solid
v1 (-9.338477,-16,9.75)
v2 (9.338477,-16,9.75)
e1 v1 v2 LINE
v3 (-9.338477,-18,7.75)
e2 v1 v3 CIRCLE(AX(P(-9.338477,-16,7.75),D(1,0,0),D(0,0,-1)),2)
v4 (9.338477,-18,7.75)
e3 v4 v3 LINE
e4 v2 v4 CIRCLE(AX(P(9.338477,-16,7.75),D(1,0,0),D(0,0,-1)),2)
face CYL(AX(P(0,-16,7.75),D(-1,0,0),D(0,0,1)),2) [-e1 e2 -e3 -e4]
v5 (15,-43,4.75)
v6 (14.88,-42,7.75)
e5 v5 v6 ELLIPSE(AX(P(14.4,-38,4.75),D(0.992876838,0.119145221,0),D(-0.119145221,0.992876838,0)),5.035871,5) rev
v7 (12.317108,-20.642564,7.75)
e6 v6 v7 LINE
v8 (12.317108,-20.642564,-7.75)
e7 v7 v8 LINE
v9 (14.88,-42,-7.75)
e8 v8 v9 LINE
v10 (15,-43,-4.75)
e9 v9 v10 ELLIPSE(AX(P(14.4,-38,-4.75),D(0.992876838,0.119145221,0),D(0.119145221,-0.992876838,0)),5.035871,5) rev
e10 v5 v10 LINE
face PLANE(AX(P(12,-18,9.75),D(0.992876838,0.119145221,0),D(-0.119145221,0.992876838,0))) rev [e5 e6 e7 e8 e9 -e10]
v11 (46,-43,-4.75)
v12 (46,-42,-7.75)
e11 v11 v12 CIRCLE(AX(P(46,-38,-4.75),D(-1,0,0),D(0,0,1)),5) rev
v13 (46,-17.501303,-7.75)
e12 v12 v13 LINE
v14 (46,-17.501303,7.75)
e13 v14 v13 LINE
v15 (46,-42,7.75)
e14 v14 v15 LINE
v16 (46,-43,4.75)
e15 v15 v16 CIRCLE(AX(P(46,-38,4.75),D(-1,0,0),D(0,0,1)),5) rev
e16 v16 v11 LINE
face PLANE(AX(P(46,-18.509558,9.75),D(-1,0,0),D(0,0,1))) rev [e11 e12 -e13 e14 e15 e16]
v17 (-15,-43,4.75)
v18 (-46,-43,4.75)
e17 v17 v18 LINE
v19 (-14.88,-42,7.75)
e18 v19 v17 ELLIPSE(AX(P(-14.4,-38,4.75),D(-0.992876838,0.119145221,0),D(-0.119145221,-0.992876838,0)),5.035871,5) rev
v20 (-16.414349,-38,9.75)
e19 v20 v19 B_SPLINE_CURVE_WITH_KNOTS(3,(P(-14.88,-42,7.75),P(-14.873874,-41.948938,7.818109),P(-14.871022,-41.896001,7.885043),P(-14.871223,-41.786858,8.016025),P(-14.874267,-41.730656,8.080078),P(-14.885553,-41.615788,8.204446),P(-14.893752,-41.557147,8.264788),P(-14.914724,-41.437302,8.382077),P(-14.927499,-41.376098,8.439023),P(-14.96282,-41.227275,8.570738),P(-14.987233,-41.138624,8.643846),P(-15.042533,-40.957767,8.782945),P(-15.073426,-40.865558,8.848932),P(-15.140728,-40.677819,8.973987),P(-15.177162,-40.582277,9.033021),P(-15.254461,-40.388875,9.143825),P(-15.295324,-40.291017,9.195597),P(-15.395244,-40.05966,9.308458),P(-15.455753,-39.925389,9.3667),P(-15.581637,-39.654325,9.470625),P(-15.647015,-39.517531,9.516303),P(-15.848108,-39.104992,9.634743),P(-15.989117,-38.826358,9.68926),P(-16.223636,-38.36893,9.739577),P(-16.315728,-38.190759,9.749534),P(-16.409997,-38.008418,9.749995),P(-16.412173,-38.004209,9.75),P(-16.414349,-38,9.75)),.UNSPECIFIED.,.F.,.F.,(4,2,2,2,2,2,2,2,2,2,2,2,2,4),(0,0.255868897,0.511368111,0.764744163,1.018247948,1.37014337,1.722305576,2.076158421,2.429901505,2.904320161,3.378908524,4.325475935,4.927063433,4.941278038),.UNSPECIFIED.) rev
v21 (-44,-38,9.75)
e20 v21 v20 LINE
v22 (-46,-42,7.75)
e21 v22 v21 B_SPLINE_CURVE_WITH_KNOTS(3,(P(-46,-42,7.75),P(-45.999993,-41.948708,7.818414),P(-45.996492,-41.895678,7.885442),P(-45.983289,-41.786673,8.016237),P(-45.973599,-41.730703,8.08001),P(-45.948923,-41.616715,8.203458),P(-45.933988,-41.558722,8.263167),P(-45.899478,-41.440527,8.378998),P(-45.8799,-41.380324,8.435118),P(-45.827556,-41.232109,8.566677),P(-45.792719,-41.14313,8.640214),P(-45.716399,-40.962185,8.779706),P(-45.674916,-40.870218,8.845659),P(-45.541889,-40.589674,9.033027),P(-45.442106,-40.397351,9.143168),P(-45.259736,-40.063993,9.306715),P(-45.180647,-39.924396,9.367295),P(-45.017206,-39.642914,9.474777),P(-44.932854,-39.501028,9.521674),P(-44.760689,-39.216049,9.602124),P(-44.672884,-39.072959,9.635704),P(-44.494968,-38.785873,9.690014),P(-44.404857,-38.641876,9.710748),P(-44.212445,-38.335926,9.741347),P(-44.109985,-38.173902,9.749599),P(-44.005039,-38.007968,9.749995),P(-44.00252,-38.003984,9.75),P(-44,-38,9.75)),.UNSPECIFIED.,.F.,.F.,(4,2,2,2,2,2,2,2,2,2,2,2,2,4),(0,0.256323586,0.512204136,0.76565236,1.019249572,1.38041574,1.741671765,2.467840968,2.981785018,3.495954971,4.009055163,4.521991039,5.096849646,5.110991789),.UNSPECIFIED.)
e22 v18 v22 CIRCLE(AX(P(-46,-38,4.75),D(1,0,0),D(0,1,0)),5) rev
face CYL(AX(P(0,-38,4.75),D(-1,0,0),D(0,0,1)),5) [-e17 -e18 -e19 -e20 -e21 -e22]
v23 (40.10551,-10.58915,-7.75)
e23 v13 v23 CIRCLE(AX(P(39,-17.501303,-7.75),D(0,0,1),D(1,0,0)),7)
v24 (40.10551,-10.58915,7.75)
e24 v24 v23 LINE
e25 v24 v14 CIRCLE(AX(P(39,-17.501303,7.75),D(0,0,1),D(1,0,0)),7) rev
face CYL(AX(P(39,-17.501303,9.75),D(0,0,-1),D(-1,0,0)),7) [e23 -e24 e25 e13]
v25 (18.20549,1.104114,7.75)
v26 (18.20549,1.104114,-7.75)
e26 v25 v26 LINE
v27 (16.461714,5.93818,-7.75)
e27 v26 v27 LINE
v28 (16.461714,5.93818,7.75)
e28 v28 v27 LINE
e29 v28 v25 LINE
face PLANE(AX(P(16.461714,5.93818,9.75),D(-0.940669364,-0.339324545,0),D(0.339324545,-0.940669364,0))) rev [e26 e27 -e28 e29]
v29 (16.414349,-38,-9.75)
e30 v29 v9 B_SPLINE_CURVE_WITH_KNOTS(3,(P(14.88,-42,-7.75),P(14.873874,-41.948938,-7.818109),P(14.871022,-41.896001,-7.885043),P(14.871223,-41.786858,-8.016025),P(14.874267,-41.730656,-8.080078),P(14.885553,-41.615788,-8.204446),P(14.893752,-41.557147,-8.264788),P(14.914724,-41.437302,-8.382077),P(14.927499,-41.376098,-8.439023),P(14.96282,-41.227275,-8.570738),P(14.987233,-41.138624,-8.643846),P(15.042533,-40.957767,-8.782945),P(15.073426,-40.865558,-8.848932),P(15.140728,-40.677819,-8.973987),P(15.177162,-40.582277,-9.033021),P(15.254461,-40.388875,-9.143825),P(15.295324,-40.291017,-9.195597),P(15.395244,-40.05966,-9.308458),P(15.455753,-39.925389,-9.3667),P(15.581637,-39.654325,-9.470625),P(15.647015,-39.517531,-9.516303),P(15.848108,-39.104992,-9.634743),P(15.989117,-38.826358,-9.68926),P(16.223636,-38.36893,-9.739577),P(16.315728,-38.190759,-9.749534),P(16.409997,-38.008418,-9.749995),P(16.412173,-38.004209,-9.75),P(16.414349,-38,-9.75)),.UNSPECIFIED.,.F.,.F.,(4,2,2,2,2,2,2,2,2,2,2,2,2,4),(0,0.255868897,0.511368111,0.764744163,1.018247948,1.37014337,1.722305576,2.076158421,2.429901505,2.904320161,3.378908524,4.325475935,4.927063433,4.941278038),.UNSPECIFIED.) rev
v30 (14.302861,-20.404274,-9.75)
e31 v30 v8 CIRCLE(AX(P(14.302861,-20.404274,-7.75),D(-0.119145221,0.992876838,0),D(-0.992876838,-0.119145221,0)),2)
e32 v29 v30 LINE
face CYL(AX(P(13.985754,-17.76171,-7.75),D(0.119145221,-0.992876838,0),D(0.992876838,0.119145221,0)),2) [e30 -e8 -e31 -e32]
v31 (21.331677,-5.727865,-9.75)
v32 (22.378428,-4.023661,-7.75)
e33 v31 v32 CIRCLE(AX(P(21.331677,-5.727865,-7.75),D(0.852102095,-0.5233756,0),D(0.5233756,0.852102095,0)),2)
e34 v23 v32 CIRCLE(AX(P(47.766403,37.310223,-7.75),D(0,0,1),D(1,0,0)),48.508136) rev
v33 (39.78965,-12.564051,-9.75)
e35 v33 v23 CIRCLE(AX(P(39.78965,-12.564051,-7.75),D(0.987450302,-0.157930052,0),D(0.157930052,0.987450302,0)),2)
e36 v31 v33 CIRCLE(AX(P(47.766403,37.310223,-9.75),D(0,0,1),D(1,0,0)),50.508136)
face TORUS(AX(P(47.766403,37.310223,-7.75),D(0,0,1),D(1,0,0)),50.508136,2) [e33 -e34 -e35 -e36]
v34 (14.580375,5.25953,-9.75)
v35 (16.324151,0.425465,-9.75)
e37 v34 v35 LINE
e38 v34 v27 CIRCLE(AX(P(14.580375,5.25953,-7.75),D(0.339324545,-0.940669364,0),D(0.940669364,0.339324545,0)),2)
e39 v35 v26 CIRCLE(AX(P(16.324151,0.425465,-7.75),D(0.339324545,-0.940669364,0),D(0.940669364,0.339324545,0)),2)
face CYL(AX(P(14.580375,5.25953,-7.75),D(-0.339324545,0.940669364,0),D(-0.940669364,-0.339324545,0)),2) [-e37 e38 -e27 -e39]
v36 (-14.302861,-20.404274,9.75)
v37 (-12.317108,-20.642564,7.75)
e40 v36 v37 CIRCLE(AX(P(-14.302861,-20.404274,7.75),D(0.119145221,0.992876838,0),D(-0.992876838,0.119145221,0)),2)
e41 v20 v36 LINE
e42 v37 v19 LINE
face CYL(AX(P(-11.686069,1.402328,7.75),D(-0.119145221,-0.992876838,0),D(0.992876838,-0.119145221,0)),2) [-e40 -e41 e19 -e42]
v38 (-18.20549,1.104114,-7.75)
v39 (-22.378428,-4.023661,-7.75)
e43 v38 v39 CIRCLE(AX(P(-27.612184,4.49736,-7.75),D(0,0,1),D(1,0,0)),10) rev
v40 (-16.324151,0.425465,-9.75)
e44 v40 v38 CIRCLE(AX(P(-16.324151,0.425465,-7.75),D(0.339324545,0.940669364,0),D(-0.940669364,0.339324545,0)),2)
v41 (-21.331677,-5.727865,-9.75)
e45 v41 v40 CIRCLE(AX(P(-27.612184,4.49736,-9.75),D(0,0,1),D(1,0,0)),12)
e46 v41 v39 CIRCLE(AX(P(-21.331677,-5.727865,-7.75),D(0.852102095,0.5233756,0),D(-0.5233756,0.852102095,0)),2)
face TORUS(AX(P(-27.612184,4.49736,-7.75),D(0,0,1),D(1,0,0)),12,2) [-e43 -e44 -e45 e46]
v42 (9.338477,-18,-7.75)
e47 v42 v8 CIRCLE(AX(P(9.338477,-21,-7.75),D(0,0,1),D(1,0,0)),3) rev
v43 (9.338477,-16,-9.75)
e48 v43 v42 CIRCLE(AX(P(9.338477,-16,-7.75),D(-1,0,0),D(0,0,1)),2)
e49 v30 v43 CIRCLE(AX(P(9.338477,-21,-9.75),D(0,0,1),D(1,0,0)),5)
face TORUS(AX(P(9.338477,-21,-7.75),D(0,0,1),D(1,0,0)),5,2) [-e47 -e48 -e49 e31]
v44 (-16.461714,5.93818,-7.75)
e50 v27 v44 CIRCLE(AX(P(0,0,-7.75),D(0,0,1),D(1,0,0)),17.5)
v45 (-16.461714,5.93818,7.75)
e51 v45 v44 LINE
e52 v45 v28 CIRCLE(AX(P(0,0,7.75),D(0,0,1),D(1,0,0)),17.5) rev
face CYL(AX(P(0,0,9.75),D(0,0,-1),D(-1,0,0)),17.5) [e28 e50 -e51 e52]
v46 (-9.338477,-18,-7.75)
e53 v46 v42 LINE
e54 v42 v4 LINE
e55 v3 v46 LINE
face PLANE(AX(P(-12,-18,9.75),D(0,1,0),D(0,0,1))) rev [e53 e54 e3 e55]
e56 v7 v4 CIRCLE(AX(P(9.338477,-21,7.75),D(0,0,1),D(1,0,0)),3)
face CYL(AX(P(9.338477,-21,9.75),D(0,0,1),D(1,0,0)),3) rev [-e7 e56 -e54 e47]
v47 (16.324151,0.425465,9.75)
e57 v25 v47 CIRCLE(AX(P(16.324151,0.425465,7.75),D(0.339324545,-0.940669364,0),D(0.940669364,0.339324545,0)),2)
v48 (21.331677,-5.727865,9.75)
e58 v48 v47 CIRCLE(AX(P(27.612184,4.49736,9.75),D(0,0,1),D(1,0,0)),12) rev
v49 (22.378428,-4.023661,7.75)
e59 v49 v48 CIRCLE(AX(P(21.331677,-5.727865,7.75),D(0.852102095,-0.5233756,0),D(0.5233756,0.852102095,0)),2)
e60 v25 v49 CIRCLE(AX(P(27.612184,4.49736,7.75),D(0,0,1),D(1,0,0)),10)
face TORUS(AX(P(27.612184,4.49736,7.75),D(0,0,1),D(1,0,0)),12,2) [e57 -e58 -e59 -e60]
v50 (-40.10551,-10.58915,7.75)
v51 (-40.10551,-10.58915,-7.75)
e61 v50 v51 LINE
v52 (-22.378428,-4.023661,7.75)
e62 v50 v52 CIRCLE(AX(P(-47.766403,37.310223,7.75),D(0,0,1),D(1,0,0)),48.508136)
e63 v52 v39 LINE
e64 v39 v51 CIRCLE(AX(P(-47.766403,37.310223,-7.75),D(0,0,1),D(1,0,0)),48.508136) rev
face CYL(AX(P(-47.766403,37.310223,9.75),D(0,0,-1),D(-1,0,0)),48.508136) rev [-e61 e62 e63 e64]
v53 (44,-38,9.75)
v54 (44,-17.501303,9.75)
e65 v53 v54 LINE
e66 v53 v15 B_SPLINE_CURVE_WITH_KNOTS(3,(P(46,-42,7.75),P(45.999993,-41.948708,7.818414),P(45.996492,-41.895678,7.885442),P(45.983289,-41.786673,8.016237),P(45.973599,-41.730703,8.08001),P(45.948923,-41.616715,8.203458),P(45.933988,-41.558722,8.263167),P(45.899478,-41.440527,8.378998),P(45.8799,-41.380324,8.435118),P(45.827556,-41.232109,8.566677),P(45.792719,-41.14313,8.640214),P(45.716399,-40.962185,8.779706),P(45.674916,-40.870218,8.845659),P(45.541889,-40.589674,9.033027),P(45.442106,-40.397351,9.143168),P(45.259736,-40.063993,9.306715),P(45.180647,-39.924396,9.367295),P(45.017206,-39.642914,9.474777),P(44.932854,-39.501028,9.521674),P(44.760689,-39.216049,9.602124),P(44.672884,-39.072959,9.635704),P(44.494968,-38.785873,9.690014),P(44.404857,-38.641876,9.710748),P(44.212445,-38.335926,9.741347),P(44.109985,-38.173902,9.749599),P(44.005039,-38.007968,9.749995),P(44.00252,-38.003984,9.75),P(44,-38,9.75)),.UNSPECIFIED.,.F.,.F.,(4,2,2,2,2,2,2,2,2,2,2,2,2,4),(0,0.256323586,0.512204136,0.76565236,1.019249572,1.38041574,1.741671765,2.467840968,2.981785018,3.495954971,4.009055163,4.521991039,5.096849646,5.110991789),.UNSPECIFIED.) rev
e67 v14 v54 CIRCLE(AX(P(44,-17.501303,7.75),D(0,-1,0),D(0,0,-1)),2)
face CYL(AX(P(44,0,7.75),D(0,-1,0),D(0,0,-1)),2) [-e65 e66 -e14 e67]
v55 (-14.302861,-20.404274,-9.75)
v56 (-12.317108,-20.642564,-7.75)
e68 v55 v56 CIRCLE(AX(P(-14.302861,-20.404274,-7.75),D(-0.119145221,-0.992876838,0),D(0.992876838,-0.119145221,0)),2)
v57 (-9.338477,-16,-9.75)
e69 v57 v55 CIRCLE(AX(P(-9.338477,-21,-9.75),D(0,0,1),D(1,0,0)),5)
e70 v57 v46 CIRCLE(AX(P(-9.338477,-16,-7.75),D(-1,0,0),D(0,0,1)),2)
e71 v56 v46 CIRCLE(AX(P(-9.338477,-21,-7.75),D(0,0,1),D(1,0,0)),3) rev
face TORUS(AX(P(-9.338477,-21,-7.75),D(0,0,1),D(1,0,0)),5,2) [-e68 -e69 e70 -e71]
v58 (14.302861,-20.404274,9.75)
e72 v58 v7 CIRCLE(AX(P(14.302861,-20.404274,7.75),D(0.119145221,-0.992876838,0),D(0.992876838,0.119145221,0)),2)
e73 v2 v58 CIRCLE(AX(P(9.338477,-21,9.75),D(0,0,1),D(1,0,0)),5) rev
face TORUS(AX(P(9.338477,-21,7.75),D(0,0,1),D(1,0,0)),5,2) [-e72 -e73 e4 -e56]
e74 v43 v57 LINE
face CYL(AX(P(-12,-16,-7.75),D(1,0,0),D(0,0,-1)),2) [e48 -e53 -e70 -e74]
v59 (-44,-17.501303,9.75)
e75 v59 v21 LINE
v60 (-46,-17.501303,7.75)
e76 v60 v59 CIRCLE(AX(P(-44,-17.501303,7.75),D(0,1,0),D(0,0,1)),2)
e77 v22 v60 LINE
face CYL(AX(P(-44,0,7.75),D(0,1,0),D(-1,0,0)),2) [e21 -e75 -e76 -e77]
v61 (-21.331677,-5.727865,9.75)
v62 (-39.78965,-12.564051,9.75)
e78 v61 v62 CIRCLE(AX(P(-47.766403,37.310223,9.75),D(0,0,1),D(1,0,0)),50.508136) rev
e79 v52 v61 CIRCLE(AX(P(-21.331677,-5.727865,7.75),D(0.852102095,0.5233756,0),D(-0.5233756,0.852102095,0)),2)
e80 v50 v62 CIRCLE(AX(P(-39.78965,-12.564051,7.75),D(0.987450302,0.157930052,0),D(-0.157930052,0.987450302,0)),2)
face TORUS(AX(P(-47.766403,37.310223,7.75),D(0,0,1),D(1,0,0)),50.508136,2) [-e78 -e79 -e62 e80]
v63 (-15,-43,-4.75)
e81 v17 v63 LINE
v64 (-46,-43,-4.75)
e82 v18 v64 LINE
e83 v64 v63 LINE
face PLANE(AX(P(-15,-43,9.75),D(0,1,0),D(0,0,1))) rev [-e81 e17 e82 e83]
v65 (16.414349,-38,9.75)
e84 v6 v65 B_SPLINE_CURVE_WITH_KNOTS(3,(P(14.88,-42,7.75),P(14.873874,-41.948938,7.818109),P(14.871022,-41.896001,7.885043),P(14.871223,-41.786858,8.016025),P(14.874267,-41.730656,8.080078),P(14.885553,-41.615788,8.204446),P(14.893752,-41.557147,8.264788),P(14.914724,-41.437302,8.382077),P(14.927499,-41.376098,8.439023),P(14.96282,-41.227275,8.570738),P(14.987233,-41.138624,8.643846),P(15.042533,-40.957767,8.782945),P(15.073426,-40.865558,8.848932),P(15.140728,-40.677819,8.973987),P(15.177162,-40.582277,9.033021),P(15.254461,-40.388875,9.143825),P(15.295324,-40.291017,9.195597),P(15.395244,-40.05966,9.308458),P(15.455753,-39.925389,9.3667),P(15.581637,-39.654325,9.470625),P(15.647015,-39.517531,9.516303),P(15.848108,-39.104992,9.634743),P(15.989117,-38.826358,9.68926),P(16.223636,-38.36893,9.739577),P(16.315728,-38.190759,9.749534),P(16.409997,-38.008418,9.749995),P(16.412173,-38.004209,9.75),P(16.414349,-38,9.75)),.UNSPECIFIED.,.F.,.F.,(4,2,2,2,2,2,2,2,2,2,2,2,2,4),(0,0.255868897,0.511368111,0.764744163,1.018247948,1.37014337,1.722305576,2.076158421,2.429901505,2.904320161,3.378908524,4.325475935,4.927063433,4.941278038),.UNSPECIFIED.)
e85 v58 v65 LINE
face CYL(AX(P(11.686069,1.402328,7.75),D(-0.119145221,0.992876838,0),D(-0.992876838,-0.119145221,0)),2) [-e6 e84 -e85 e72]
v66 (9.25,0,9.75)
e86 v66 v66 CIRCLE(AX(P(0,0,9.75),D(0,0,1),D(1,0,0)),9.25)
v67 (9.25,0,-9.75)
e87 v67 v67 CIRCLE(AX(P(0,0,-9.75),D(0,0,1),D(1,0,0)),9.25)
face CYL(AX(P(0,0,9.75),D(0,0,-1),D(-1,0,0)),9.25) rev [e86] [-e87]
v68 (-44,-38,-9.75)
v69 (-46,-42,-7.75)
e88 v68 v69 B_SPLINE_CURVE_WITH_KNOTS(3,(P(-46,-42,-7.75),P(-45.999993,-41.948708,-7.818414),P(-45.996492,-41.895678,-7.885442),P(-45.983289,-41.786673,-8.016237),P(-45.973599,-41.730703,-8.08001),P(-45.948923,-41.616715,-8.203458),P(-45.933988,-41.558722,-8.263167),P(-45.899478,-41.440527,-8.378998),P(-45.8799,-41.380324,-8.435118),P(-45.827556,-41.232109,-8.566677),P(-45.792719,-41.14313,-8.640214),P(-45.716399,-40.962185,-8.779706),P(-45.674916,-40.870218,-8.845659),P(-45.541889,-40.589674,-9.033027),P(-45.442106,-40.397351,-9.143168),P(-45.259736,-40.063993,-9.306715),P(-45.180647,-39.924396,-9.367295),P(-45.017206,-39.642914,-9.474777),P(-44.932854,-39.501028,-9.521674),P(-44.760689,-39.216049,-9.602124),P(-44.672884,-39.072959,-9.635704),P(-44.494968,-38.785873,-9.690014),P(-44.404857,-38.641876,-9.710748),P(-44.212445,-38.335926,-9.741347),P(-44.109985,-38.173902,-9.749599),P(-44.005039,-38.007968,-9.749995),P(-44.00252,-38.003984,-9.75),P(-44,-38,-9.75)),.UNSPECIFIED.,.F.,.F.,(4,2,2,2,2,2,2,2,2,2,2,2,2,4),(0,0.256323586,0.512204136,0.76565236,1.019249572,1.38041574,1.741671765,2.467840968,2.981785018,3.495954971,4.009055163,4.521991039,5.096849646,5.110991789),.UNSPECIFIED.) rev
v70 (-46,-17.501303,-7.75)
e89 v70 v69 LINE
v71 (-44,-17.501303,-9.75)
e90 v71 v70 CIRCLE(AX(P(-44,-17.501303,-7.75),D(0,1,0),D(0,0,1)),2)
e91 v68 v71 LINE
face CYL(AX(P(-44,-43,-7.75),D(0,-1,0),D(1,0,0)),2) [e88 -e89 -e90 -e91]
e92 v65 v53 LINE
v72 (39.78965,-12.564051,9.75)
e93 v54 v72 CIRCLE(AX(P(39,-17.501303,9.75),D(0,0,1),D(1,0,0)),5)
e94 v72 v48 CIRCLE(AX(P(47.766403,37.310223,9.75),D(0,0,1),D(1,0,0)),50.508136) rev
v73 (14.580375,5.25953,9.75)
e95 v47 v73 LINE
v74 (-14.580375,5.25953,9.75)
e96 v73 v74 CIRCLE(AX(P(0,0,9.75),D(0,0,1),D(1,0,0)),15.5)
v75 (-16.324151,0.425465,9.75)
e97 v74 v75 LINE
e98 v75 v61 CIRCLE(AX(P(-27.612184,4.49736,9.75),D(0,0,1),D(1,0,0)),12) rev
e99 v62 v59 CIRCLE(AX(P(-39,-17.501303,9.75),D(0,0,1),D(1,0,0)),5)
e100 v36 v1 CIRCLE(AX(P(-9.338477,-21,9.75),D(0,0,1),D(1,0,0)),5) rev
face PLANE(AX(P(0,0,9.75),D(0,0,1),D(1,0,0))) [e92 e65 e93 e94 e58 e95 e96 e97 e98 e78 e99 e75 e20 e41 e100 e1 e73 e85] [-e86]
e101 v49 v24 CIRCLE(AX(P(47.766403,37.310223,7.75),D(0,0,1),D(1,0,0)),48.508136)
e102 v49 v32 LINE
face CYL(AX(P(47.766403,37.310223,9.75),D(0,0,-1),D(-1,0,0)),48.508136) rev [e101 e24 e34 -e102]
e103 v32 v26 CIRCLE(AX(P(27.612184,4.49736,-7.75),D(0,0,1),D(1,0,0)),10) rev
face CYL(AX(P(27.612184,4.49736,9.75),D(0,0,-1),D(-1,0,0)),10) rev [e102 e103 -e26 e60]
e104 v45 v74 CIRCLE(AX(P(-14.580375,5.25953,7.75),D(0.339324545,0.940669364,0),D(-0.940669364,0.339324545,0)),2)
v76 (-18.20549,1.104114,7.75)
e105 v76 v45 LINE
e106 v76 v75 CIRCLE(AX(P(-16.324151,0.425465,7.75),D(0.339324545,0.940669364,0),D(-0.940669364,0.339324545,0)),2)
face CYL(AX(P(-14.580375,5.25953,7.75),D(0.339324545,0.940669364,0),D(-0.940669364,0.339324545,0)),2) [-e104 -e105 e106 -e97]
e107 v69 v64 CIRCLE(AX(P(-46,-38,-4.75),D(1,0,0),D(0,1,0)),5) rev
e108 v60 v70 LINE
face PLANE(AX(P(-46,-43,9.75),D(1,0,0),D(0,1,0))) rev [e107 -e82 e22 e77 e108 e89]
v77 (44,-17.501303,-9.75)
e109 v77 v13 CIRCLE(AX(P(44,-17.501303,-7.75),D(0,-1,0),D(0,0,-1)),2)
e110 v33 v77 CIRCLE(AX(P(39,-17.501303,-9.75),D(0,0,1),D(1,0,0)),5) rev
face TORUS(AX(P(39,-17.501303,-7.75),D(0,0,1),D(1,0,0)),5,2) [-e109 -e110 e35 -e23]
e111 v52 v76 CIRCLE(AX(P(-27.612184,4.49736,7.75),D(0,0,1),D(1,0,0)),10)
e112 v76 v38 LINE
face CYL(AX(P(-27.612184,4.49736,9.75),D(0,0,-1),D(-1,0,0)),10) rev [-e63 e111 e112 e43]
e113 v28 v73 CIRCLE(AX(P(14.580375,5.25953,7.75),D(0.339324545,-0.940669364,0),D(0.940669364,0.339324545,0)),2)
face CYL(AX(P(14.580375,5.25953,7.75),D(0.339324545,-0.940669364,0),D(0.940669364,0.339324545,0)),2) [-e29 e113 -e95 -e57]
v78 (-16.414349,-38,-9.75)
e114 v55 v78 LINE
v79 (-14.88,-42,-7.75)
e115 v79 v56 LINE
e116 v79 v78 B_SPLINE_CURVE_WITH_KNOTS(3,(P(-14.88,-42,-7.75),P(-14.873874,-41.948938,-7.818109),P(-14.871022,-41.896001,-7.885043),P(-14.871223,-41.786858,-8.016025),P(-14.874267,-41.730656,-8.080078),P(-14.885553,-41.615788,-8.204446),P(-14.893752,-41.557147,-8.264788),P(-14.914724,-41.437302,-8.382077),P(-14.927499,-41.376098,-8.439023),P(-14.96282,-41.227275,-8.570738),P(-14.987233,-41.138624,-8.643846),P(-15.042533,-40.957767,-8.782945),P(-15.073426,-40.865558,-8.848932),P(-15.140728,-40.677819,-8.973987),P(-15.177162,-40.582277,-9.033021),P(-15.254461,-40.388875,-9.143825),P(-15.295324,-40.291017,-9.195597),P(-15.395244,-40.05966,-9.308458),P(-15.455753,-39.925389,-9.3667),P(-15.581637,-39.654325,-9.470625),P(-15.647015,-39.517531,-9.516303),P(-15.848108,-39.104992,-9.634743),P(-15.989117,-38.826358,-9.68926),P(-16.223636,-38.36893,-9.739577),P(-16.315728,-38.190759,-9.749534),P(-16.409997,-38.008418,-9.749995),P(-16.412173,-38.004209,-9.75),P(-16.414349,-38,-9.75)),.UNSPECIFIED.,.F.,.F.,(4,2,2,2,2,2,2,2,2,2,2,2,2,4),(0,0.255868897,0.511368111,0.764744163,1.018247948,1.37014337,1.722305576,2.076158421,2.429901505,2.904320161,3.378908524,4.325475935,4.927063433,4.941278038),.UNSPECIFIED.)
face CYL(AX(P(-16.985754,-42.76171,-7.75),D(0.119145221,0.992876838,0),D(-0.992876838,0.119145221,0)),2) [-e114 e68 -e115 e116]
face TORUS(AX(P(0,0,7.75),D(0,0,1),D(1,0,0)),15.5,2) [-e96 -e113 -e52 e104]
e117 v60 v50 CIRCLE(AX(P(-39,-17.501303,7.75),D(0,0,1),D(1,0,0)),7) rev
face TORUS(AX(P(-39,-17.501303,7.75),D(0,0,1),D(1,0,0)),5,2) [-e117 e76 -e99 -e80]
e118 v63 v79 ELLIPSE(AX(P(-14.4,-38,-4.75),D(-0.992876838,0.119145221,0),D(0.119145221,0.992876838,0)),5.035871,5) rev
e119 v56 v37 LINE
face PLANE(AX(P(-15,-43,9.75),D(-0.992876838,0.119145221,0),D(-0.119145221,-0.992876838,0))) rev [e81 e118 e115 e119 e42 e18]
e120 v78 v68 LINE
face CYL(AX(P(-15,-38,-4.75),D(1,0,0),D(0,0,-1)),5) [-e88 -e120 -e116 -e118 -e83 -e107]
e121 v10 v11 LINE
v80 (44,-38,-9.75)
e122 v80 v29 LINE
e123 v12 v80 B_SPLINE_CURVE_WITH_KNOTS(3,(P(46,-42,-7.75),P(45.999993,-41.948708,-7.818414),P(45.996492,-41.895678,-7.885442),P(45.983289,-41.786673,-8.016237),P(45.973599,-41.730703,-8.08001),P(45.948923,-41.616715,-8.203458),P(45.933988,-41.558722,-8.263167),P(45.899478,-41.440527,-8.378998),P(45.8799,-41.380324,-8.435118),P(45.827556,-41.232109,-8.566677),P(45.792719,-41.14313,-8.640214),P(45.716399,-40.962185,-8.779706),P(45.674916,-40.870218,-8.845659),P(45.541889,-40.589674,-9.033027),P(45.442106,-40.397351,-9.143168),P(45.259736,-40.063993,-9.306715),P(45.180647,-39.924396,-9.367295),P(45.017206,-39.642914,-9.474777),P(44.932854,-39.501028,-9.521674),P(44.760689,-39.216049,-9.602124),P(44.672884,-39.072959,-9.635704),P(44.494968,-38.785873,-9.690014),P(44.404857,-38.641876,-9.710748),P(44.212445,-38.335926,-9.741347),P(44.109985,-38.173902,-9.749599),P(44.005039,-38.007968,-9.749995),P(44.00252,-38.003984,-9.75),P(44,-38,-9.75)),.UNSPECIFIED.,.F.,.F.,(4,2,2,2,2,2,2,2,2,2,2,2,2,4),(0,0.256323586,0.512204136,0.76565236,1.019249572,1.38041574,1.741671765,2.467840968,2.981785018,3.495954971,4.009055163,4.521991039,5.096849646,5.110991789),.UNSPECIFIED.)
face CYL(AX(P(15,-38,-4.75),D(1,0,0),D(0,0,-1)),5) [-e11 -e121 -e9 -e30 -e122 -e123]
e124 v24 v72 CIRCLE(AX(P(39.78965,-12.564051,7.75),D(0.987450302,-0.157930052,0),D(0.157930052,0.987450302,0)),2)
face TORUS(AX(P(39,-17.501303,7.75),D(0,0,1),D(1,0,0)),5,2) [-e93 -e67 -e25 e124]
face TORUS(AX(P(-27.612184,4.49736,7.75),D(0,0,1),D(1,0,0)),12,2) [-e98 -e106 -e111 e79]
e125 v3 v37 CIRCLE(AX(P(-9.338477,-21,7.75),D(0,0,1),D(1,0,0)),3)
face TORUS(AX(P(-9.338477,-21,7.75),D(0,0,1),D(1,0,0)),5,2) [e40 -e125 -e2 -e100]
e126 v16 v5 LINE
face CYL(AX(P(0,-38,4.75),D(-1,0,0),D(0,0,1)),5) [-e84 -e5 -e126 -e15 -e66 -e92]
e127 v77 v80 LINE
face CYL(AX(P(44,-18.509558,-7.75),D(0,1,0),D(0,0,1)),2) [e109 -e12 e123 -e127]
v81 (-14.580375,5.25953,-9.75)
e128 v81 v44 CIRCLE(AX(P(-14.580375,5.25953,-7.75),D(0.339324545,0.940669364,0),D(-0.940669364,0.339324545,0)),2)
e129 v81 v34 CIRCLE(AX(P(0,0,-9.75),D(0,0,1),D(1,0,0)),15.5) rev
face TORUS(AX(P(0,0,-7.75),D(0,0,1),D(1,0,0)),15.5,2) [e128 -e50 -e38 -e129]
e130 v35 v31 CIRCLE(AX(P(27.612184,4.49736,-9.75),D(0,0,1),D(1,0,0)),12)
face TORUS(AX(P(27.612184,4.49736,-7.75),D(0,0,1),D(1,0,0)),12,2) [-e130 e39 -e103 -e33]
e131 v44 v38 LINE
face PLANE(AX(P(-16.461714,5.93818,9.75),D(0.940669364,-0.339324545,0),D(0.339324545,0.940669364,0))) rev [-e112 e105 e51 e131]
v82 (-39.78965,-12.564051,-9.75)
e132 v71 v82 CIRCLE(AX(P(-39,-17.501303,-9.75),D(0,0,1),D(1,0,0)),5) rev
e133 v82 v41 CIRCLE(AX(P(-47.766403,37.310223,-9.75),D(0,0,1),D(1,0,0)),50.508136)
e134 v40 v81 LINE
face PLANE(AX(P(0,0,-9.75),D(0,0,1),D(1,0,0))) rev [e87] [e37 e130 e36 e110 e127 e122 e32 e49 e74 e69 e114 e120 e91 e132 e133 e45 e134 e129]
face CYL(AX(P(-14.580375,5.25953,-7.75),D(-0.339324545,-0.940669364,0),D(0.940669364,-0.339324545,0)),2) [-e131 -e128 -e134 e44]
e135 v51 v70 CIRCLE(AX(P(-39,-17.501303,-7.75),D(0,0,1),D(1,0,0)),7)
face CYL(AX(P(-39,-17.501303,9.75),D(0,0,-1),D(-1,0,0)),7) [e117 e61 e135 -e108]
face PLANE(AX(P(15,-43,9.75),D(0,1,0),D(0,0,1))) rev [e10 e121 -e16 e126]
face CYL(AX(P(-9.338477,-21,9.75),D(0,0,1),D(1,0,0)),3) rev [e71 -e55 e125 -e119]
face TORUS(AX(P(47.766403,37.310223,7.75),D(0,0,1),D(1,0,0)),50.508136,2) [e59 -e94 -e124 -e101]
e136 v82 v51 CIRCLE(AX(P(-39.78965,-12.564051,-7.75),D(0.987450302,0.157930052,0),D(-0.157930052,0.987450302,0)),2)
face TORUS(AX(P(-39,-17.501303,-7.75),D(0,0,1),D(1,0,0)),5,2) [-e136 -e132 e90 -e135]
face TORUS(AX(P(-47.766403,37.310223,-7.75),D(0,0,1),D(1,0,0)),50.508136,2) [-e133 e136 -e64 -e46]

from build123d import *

# Parameters (mm, degrees)
CROQUIS1_R              = 9.25
SALIENTE_EXTRUIR1_DEPTH = 9.75
REDONDEO4_R             = 3
REDONDEO5_R             = 2
REDONDEO6_R             = 5


with BuildPart() as part:
    # Croquis1 → Saliente-Extruir1 (new, symmetric)
    with BuildSketch(Plane.XY):
        with BuildLine():
            Line((16.461713879, 5.938179534), (18.205490224, 1.104114294))
            ThreePointArc((18.205490224, 1.104114294), (19.855946903, -1.814596224), (22.378427867, -4.023661212))
            ThreePointArc((22.378427867, -4.023661212), (30.919049272, -8.178302275), (40.105510362, -10.589150466))
            ThreePointArc((40.105510362, -10.589150466), (44.326282594, -12.959198031), (46, -17.50130258))
            Line((46, -17.50130258), (46, -18.509558121))
            Line((46, -18.509558121), (46, -43))
            Line((46, -43), (15, -43))
            Line((15, -43), (12, -18))
            Line((12, -18), (-12, -18))
            Line((-12, -18), (-15, -43))
            Line((-15, -43), (-46, -43))
            Line((-46, -43), (-46, -18.509558121))
            Line((-46, -18.509558121), (-46, -17.50130258))
            ThreePointArc((-46, -17.50130258), (-44.326282594, -12.959198031), (-40.105510362, -10.589150466))
            ThreePointArc((-40.105510362, -10.589150466), (-30.919049272, -8.178302275), (-22.378427867, -4.023661212))
            ThreePointArc((-22.378427867, -4.023661212), (-19.855946903, -1.814596224), (-18.205490224, 1.104114294))
            Line((-18.205490224, 1.104114294), (-16.461713879, 5.938179534))
            ThreePointArc((-16.461713879, 5.938179534), (0, 17.5), (16.461713879, 5.938179534))
        make_face()
        Circle(CROQUIS1_R, mode=Mode.SUBTRACT)
    extrude(amount=SALIENTE_EXTRUIR1_DEPTH, both=True)

    # Redondeo4
    redondeo4_edges = [part.edges().sort_by_distance(p)[0] for p in [
        (12, -18, 0),
        (-12, -18, 0),
    ]]
    fillet(redondeo4_edges, radius=REDONDEO4_R)

    # Redondeo5
    redondeo5_edges = [part.edges().sort_by_distance(p)[0] for p in [
        (-19.855946903, -1.814596224, 9.75),
        (-30.919049272, -8.178302275, 9.75),
        (17.333602052, 3.521146914, -9.75),
        (-44.326282594, -12.959198031, 9.75),
        (19.855946903, -1.814596224, -9.75),
        (30.919049272, -8.178302275, -9.75),
        (44.326282594, -12.959198031, -9.75),
        (46, -30.25065129, -9.75),
        (-46, -30.25065129, 9.75),
        (-13.65855386, -31.821282169, -9.75),
        (-46, -30.25065129, -9.75),
        (-44.326282594, -12.959198031, -9.75),
        (-30.919049272, -8.178302275, -9.75),
        (-19.855946903, -1.814596224, -9.75),
        (-17.333602052, 3.521146914, -9.75),
        (0, 17.5, -9.75),
        (-13.65855386, -31.821282169, 9.75),
        (0, 17.5, 9.75),
        (46, -30.25065129, 9.75),
        (44.326282594, -12.959198031, 9.75),
        (30.919049272, -8.178302275, 9.75),
        (19.855946903, -1.814596224, 9.75),
        (13.65855386, -31.821282169, -9.75),
        (13.65855386, -31.821282169, 9.75),
        (0, -18, -9.75),
        (17.333602052, 3.521146914, 9.75),
        (0, -18, 9.75),
        (11.329418316, -18.755862417, -9.75),
        (11.329418316, -18.755862417, 9.75),
        (-11.329418316, -18.755862417, -9.75),
        (-11.329418316, -18.755862417, 9.75),
        (-17.333602052, 3.521146914, 9.75),
    ]]
    fillet(redondeo5_edges, radius=REDONDEO5_R)

    # Redondeo6
    # the kernel refuses this fillet: 5 mm, written as the material it takes off along each edge
    with BuildSketch(Plane(origin=(56.5, -43, 9.75), x_dir=(0, 1, 0), z_dir=(-1, 0, 0)), Plane(origin=(-4.51434853, -43, 9.75), x_dir=(0, 1, 0), z_dir=(-1, 0, 0)), Plane(origin=(56.5, -43, -9.75), x_dir=(0, 0, 1), z_dir=(-1, 0, 0)), Plane(origin=(-4.51434853, -43, -9.75), x_dir=(0, 0, 1), z_dir=(-1, 0, 0))) as redondeo6_piece_1:
        with BuildLine():
            CenterArc((REDONDEO6_R, REDONDEO6_R), REDONDEO6_R, 180, 90)
            Line((0, REDONDEO6_R), (0, 0))
            Line((0, 0), (REDONDEO6_R, 0))
        make_face()
    extrude(amount=51.98565147, mode=Mode.SUBTRACT)


solid = part.part
